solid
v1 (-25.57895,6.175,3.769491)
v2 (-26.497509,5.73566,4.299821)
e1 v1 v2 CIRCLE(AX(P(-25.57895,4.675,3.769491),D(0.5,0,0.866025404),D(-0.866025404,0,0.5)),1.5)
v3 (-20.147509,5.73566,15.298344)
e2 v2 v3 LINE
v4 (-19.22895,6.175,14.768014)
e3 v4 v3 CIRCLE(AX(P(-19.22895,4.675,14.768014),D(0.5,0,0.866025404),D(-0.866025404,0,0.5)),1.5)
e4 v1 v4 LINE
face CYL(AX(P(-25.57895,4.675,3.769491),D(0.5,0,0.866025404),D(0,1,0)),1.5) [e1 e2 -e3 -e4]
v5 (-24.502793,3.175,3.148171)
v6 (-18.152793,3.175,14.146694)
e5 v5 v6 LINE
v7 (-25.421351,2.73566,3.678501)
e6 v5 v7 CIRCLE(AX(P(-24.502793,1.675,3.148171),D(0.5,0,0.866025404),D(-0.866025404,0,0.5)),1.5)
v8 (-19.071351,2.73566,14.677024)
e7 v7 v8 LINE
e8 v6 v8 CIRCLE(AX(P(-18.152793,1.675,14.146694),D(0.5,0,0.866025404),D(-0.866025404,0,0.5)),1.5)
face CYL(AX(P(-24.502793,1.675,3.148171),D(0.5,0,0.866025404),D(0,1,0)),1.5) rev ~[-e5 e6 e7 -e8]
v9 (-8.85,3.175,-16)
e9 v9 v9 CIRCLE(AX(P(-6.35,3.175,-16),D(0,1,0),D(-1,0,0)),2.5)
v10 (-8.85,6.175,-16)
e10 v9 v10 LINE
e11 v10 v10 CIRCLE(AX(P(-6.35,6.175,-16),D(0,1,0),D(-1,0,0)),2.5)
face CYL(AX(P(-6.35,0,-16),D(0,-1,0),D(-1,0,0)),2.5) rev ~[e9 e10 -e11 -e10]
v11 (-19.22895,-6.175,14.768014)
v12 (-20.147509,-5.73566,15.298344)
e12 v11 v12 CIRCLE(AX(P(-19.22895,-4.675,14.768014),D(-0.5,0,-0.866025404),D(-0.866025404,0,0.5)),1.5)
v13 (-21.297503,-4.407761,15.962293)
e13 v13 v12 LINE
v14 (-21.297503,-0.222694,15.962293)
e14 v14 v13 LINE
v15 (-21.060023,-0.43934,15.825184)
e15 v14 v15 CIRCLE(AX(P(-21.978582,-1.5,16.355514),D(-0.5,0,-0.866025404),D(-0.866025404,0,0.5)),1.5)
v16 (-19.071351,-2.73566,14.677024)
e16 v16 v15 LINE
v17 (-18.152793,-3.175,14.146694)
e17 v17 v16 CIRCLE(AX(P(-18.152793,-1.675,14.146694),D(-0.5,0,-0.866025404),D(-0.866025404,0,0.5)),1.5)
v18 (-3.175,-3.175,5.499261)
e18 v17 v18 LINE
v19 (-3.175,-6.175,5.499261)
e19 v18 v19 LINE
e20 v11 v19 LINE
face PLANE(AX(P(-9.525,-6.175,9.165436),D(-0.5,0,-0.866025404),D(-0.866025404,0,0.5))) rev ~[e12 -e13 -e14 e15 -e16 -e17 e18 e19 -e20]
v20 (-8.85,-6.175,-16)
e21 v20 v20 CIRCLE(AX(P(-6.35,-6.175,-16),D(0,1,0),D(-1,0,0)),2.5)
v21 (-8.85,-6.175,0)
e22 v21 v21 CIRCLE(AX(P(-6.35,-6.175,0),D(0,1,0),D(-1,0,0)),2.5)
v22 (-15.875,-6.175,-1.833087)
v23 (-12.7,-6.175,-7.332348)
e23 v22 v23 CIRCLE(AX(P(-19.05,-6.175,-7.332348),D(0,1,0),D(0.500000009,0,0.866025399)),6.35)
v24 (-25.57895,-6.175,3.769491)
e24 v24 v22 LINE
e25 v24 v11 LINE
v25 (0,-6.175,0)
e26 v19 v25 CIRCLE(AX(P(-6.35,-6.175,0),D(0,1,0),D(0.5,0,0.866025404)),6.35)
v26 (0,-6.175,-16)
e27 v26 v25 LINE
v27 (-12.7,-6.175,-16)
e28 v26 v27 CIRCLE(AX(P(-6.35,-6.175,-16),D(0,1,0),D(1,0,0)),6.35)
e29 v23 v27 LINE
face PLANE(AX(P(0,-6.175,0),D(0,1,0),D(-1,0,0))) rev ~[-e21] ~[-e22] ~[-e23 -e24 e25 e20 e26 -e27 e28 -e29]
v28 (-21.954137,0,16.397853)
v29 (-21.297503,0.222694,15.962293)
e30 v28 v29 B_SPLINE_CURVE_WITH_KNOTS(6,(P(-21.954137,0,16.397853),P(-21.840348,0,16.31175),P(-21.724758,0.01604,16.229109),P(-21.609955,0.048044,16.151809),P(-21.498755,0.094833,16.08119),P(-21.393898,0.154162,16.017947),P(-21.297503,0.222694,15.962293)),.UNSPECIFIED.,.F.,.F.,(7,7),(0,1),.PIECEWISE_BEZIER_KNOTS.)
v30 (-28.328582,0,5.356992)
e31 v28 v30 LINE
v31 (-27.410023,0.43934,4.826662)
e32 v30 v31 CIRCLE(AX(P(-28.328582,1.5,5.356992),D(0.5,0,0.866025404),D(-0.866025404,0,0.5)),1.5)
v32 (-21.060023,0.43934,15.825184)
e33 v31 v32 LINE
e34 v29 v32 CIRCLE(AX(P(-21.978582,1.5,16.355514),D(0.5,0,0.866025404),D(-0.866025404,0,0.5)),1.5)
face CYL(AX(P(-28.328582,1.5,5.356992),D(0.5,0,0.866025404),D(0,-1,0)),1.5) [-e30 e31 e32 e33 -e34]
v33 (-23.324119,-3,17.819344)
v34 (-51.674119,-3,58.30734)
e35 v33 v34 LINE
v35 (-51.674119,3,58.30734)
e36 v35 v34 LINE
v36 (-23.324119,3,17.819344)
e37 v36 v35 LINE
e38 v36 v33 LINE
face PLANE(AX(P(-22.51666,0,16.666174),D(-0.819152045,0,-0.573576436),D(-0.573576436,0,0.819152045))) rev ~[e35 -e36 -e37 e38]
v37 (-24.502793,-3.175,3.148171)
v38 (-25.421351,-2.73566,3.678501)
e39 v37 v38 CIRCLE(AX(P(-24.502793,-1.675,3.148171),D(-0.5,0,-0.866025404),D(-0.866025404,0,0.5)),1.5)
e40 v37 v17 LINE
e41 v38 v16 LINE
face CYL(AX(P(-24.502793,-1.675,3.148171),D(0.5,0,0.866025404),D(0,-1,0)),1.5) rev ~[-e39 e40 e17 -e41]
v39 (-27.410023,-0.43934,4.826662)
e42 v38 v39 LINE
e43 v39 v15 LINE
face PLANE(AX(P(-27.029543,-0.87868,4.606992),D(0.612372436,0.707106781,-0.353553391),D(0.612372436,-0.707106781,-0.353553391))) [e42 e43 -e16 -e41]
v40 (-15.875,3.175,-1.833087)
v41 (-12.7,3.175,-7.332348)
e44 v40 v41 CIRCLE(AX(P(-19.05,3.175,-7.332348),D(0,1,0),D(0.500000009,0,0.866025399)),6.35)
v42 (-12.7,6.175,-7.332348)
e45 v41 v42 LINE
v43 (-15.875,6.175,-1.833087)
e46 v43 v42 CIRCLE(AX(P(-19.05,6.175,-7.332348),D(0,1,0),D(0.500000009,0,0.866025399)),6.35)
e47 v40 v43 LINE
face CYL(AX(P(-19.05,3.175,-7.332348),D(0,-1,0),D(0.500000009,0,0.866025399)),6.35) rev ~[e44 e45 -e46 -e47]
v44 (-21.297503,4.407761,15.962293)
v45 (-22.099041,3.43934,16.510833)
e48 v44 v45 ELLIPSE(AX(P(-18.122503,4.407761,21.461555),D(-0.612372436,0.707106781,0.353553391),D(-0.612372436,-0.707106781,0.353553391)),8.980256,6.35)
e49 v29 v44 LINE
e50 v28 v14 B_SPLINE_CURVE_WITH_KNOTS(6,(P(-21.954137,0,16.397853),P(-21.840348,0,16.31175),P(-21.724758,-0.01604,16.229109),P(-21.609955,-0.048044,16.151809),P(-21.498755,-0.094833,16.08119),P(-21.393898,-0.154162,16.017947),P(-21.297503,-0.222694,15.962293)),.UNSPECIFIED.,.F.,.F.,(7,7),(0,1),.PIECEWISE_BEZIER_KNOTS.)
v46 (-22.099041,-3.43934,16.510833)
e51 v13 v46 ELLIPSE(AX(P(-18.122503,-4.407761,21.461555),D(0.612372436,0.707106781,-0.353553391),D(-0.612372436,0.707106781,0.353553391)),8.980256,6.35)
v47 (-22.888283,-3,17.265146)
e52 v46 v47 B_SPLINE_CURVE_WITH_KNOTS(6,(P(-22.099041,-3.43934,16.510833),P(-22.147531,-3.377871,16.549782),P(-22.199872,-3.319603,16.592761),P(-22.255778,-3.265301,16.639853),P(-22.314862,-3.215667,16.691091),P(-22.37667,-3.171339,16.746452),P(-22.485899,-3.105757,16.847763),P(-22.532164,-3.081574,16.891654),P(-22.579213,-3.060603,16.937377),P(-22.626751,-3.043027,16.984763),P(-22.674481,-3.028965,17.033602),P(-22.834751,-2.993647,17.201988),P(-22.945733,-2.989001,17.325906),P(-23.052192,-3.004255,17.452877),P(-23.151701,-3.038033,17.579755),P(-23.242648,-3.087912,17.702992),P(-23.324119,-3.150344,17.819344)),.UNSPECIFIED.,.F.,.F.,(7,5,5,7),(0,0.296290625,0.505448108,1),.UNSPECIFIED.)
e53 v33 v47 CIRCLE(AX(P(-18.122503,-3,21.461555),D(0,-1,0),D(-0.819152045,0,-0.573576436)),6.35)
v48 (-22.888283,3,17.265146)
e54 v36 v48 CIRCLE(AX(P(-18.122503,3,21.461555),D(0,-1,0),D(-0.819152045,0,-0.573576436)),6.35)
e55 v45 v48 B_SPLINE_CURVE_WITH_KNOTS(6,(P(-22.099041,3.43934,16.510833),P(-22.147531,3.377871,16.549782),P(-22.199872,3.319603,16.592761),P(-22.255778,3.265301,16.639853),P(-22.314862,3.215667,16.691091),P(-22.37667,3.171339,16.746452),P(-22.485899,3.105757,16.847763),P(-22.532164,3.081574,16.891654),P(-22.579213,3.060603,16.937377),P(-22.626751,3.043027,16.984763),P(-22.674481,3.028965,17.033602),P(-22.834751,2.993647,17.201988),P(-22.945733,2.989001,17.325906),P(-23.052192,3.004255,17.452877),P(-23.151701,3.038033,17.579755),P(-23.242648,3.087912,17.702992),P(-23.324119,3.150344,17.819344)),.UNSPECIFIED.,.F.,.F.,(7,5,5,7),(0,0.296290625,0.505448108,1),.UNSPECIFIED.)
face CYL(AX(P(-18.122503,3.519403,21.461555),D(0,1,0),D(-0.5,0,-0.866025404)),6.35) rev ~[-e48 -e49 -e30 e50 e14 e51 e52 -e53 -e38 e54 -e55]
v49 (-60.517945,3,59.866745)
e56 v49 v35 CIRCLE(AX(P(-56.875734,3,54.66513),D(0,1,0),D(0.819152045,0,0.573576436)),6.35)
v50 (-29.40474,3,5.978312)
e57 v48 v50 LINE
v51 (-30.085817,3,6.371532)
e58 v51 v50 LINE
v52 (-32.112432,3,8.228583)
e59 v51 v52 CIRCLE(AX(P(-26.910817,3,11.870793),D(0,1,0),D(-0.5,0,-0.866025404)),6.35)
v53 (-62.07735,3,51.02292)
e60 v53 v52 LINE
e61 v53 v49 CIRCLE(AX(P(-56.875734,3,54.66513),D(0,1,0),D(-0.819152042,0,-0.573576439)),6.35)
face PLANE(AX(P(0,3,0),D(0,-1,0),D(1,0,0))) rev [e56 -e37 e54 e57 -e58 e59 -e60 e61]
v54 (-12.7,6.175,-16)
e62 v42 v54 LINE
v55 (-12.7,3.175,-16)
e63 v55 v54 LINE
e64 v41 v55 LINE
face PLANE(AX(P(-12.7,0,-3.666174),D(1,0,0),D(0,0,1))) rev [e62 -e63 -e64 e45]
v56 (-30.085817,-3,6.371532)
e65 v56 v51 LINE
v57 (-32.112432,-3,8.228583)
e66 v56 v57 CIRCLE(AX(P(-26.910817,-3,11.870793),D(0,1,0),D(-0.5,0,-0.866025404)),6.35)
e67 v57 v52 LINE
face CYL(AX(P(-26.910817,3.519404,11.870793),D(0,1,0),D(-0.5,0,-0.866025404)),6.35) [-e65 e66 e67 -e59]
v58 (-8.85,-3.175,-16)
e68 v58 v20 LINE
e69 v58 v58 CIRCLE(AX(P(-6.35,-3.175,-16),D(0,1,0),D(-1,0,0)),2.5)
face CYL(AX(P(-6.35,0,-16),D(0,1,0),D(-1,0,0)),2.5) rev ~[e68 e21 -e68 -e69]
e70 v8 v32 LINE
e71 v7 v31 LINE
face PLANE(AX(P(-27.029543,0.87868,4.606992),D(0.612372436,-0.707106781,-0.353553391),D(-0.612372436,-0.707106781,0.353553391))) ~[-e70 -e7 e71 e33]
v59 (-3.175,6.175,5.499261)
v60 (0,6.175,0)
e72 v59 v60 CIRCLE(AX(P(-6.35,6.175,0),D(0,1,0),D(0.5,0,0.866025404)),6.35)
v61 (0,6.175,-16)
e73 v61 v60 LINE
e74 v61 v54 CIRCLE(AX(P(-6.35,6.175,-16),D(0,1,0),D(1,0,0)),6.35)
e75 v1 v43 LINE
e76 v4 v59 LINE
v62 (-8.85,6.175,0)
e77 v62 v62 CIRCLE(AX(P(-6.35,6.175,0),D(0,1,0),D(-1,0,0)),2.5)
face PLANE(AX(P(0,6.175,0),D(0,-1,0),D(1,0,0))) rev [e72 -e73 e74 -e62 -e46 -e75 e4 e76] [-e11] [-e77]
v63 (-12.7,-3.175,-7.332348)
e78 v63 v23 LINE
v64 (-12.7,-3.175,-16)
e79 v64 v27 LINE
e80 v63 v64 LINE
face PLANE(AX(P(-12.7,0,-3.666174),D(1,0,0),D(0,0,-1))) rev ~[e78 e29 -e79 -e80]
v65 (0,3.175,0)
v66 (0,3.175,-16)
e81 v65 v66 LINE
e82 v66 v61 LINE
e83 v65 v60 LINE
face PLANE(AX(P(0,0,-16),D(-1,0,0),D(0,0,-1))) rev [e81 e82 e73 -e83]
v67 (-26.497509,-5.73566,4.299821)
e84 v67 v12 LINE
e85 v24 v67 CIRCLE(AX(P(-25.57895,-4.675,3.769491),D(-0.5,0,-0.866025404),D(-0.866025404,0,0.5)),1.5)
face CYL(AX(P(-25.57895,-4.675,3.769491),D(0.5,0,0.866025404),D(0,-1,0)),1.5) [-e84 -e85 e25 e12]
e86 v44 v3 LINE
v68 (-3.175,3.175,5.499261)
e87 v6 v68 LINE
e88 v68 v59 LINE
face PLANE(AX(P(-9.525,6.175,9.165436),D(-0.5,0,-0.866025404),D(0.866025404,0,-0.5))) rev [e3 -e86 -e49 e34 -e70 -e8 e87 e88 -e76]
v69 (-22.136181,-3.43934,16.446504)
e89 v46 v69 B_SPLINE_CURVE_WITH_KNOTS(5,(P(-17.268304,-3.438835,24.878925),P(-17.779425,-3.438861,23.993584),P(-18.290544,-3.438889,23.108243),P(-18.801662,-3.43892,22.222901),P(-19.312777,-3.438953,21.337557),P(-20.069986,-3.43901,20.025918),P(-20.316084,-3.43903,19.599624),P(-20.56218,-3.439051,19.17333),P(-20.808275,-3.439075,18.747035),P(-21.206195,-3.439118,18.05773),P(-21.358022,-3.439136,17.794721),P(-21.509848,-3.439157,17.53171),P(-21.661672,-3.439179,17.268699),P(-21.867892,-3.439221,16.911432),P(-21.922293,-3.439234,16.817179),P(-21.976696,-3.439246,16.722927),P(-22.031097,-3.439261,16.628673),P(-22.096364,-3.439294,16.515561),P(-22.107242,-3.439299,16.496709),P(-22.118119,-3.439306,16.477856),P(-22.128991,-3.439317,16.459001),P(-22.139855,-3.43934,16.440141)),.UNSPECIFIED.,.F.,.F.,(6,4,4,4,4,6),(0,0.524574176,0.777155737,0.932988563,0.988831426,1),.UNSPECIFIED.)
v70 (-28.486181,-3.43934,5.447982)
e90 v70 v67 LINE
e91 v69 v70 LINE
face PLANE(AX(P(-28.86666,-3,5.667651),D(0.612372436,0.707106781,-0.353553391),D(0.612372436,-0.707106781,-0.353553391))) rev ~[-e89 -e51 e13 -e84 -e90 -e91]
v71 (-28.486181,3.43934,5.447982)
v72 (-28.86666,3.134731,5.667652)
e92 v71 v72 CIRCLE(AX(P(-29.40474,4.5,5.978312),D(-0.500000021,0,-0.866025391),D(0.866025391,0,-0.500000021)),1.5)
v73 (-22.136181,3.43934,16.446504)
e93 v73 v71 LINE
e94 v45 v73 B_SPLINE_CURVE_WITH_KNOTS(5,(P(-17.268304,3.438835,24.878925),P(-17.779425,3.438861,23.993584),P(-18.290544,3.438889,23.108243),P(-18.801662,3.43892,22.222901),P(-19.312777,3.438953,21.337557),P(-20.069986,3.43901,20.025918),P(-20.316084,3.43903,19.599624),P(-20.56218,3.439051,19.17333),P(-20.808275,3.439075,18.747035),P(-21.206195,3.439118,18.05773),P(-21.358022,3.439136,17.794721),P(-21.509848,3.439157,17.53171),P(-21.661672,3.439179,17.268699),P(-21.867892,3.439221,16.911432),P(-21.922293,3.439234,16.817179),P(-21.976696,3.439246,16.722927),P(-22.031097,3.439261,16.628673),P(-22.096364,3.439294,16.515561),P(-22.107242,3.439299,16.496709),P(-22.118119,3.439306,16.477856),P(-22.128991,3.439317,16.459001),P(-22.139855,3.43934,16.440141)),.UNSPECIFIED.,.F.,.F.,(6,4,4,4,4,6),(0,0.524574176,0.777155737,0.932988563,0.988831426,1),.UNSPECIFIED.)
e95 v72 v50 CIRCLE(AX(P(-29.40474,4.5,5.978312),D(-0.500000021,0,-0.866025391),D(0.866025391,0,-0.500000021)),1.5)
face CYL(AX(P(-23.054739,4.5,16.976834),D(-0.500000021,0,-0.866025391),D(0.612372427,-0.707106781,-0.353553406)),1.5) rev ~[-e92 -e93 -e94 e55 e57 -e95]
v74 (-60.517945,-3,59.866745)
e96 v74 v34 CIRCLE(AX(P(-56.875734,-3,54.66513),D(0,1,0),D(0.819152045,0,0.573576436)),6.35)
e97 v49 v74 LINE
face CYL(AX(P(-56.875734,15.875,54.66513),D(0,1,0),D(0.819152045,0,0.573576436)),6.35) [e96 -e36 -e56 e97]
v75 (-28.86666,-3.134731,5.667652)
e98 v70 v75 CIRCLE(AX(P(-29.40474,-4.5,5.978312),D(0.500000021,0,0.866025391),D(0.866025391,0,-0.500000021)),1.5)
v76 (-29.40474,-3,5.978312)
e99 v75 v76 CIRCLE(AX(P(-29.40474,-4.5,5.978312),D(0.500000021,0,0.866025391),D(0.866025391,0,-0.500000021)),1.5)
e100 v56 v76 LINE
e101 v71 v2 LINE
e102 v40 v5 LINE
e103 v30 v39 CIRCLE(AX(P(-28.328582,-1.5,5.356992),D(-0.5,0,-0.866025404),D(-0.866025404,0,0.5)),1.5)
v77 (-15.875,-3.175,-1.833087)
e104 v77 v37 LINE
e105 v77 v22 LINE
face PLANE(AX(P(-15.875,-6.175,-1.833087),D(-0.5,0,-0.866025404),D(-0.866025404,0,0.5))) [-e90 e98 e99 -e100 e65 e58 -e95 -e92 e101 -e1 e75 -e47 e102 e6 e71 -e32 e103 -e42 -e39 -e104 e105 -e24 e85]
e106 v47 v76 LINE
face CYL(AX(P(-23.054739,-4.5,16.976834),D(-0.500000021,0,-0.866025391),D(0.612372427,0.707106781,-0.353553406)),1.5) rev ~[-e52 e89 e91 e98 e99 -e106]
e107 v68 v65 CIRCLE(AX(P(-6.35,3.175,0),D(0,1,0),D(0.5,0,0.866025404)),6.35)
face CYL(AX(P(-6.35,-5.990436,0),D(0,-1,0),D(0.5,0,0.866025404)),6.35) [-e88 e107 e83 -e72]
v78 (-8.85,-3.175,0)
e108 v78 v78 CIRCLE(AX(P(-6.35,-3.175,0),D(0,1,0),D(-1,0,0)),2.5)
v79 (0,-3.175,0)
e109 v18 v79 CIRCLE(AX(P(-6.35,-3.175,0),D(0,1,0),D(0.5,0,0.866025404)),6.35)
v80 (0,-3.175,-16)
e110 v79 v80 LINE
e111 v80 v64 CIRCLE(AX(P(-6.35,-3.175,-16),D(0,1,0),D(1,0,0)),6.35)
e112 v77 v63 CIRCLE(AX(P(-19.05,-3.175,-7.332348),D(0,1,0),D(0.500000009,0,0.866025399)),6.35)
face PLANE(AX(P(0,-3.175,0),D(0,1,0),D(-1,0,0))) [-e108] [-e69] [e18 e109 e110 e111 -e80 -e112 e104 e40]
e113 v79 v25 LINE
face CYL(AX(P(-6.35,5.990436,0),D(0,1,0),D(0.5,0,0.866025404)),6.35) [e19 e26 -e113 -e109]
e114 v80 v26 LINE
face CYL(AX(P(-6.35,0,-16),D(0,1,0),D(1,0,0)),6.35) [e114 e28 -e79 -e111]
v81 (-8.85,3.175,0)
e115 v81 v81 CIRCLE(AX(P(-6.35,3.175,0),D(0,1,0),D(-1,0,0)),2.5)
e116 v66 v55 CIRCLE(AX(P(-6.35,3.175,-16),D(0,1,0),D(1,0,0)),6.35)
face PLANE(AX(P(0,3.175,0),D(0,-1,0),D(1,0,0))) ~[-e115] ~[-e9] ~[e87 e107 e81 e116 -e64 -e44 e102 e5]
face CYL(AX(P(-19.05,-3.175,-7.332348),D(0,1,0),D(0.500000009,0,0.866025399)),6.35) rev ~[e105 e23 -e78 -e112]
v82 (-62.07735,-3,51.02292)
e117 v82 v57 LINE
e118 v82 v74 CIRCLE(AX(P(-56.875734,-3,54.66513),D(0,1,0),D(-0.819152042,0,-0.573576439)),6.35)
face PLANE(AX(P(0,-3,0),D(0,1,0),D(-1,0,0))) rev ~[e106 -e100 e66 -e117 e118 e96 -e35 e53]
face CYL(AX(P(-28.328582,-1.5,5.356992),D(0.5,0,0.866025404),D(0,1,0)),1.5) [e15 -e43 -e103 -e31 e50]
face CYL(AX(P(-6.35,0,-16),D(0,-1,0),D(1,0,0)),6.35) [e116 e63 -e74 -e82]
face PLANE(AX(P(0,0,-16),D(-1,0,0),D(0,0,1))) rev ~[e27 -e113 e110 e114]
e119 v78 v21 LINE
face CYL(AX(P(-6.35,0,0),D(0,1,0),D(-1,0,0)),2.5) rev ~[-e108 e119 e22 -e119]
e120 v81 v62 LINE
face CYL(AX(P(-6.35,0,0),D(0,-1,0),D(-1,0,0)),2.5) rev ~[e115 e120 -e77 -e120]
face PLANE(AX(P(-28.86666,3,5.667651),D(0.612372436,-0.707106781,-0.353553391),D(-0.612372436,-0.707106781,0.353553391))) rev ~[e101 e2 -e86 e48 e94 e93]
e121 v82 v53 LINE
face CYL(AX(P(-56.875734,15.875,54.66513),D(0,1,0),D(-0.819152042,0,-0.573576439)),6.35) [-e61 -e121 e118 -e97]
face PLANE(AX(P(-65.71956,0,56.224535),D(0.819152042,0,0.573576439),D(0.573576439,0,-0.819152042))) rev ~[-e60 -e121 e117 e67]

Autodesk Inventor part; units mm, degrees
ref_plane "YZ Plane" through (0, 0, 0) normal (1, 0, 0) x (0, 1, 0)
ref_plane "XZ Plane" through (0, 0, 0) normal (0, 1, 0) x (-1, 0, 0)
ref_plane "XY Plane" through (0, 0, 0) normal (0, 0, 1) x (1, 0, 0)
sketch "Szkic1" plane through (0, 0, 0) normal (0, 1, 0) x (-1, 0, 0)
  line L0 (12.7, -3.666174) -> (12.7, -16)
  line L1 (0, -16) -> (0, 0)
  arc A0 (0, -16) -> (12.7, -16) centre (6.35, -16) ccw
  line L2 (0, 3.666174) -> (22.51666, 16.666174)
  line L3 (0, 0) -> (0, 3.666174)
  line L4 (22.51666, 16.666174) -> (55.316329, 63.508956)
  line L5 (65.71956, 56.224535) -> (31.304974, 7.075413)
  circle A1 centre (6.35, -16) radius 2.5
  circle A2 centre (6.35, 0) radius 2.5
  line L6 (65.71956, 56.224535) -> (55.316329, 63.508956)
  line L7 (22.51666, 16.666174) -> (28.86666, 5.667652)
  line L8 (31.304974, 7.075413) -> (12.7, -3.666174)
  line L9 (19.05, 0) -> (12.7, 10.998523)
  dimension "d5" = 155
  dimension "d7" = 5
  dimension "d9" = 26
  dimension "d11" = 12.7
  dimension "d13" = 60
extrude "Wyciągnięcie proste1" add sketch "Szkic1" against normal blind 3 contours L7 L4 L6 L5 L8
ref_plane "Płaszczyzna konstrukcyjna1" through (-15.875, -6.175, -1.833087) normal (-0.5, 0, -0.8660254) x (-0.8660254, 0, 0.5)
sketch "Szkic2" plane through (-15.875, -6.175, -1.833087) normal (-0.5, 0, -0.8660254) x (-0.8660254, 0, 0.5)
  line L0 (15.001477, 3.175) -> (11.826477, 0)
  line L1 (11.799797, -0.02668) -> (15.001477, 3.175)
  line L2 (12.880157, 5.29632) -> (10.583837, 3)
  line L3 (15.001477, 3.175) -> (15.001477, 6.175)
  line L4 (0, 6.175) -> (16.409238, 6.175)
  line L5 (12.880157, 5.29632) -> (13.758837, 6.175)
  line L6 (15.001477, 3.175) -> (11.826477, 0)
  line L7 (13.758837, 6.175) -> (15.001477, 6.175)
  line L8 (15.001477, 6.175) -> (15.001477, 3.175)
  line L9 (10.583837, 3) -> (0, 3)
  line L10 (10.583837, 3) -> (10.583837, 3)
  line L11 (0, 3) -> (0, 0)
  line L12 (0, 0) -> (11.826477, 0)
  line L13 (11.826477, 0) -> (11.826477, 0)
  point P0 (-12.83161, 6.175)
  dimension "d27" = 3
  dimension "d34" = 3.175
extrude "Wyciągnięcie proste3" add sketch "Szkic2" against normal blind 12.7
extrude "Wyciągnięcie proste4" add sketch "Szkic1" against normal blind 6.175 contours L0 A0 L1 L3 L2 L9 L8
extrude "Wyciągnięcie proste5" cut sketch "Szkic1" against normal blind 3.175 contours L0 A0 L1 L3 L2 L9 L8
fillet "Zaokrąglenie2" radius 1.5 4 edges at (-24.6155, 0, 10.5456) (-21.8659, -3.175, 8.9581) (-22.942, -6.175, 9.5794) (-25.6917, -3, 11.1669)
fillet "Zaokrąglenie3" radius 6.35 6 edges at (-12.7, -4.675, -3.6662) (-31.305, -1.5, 7.0754) (-65.7196, -1.5, 56.2245) (-22.5167, -1.5674, 16.6662) (0, -4.675, 3.6662) (-55.3163, -1.5, 63.509)
mirror "Odbij1" about plane through (-44.11811, 0, 34.588304) normal (0, 1, 0)
properties material "Stal nierdzewna"
